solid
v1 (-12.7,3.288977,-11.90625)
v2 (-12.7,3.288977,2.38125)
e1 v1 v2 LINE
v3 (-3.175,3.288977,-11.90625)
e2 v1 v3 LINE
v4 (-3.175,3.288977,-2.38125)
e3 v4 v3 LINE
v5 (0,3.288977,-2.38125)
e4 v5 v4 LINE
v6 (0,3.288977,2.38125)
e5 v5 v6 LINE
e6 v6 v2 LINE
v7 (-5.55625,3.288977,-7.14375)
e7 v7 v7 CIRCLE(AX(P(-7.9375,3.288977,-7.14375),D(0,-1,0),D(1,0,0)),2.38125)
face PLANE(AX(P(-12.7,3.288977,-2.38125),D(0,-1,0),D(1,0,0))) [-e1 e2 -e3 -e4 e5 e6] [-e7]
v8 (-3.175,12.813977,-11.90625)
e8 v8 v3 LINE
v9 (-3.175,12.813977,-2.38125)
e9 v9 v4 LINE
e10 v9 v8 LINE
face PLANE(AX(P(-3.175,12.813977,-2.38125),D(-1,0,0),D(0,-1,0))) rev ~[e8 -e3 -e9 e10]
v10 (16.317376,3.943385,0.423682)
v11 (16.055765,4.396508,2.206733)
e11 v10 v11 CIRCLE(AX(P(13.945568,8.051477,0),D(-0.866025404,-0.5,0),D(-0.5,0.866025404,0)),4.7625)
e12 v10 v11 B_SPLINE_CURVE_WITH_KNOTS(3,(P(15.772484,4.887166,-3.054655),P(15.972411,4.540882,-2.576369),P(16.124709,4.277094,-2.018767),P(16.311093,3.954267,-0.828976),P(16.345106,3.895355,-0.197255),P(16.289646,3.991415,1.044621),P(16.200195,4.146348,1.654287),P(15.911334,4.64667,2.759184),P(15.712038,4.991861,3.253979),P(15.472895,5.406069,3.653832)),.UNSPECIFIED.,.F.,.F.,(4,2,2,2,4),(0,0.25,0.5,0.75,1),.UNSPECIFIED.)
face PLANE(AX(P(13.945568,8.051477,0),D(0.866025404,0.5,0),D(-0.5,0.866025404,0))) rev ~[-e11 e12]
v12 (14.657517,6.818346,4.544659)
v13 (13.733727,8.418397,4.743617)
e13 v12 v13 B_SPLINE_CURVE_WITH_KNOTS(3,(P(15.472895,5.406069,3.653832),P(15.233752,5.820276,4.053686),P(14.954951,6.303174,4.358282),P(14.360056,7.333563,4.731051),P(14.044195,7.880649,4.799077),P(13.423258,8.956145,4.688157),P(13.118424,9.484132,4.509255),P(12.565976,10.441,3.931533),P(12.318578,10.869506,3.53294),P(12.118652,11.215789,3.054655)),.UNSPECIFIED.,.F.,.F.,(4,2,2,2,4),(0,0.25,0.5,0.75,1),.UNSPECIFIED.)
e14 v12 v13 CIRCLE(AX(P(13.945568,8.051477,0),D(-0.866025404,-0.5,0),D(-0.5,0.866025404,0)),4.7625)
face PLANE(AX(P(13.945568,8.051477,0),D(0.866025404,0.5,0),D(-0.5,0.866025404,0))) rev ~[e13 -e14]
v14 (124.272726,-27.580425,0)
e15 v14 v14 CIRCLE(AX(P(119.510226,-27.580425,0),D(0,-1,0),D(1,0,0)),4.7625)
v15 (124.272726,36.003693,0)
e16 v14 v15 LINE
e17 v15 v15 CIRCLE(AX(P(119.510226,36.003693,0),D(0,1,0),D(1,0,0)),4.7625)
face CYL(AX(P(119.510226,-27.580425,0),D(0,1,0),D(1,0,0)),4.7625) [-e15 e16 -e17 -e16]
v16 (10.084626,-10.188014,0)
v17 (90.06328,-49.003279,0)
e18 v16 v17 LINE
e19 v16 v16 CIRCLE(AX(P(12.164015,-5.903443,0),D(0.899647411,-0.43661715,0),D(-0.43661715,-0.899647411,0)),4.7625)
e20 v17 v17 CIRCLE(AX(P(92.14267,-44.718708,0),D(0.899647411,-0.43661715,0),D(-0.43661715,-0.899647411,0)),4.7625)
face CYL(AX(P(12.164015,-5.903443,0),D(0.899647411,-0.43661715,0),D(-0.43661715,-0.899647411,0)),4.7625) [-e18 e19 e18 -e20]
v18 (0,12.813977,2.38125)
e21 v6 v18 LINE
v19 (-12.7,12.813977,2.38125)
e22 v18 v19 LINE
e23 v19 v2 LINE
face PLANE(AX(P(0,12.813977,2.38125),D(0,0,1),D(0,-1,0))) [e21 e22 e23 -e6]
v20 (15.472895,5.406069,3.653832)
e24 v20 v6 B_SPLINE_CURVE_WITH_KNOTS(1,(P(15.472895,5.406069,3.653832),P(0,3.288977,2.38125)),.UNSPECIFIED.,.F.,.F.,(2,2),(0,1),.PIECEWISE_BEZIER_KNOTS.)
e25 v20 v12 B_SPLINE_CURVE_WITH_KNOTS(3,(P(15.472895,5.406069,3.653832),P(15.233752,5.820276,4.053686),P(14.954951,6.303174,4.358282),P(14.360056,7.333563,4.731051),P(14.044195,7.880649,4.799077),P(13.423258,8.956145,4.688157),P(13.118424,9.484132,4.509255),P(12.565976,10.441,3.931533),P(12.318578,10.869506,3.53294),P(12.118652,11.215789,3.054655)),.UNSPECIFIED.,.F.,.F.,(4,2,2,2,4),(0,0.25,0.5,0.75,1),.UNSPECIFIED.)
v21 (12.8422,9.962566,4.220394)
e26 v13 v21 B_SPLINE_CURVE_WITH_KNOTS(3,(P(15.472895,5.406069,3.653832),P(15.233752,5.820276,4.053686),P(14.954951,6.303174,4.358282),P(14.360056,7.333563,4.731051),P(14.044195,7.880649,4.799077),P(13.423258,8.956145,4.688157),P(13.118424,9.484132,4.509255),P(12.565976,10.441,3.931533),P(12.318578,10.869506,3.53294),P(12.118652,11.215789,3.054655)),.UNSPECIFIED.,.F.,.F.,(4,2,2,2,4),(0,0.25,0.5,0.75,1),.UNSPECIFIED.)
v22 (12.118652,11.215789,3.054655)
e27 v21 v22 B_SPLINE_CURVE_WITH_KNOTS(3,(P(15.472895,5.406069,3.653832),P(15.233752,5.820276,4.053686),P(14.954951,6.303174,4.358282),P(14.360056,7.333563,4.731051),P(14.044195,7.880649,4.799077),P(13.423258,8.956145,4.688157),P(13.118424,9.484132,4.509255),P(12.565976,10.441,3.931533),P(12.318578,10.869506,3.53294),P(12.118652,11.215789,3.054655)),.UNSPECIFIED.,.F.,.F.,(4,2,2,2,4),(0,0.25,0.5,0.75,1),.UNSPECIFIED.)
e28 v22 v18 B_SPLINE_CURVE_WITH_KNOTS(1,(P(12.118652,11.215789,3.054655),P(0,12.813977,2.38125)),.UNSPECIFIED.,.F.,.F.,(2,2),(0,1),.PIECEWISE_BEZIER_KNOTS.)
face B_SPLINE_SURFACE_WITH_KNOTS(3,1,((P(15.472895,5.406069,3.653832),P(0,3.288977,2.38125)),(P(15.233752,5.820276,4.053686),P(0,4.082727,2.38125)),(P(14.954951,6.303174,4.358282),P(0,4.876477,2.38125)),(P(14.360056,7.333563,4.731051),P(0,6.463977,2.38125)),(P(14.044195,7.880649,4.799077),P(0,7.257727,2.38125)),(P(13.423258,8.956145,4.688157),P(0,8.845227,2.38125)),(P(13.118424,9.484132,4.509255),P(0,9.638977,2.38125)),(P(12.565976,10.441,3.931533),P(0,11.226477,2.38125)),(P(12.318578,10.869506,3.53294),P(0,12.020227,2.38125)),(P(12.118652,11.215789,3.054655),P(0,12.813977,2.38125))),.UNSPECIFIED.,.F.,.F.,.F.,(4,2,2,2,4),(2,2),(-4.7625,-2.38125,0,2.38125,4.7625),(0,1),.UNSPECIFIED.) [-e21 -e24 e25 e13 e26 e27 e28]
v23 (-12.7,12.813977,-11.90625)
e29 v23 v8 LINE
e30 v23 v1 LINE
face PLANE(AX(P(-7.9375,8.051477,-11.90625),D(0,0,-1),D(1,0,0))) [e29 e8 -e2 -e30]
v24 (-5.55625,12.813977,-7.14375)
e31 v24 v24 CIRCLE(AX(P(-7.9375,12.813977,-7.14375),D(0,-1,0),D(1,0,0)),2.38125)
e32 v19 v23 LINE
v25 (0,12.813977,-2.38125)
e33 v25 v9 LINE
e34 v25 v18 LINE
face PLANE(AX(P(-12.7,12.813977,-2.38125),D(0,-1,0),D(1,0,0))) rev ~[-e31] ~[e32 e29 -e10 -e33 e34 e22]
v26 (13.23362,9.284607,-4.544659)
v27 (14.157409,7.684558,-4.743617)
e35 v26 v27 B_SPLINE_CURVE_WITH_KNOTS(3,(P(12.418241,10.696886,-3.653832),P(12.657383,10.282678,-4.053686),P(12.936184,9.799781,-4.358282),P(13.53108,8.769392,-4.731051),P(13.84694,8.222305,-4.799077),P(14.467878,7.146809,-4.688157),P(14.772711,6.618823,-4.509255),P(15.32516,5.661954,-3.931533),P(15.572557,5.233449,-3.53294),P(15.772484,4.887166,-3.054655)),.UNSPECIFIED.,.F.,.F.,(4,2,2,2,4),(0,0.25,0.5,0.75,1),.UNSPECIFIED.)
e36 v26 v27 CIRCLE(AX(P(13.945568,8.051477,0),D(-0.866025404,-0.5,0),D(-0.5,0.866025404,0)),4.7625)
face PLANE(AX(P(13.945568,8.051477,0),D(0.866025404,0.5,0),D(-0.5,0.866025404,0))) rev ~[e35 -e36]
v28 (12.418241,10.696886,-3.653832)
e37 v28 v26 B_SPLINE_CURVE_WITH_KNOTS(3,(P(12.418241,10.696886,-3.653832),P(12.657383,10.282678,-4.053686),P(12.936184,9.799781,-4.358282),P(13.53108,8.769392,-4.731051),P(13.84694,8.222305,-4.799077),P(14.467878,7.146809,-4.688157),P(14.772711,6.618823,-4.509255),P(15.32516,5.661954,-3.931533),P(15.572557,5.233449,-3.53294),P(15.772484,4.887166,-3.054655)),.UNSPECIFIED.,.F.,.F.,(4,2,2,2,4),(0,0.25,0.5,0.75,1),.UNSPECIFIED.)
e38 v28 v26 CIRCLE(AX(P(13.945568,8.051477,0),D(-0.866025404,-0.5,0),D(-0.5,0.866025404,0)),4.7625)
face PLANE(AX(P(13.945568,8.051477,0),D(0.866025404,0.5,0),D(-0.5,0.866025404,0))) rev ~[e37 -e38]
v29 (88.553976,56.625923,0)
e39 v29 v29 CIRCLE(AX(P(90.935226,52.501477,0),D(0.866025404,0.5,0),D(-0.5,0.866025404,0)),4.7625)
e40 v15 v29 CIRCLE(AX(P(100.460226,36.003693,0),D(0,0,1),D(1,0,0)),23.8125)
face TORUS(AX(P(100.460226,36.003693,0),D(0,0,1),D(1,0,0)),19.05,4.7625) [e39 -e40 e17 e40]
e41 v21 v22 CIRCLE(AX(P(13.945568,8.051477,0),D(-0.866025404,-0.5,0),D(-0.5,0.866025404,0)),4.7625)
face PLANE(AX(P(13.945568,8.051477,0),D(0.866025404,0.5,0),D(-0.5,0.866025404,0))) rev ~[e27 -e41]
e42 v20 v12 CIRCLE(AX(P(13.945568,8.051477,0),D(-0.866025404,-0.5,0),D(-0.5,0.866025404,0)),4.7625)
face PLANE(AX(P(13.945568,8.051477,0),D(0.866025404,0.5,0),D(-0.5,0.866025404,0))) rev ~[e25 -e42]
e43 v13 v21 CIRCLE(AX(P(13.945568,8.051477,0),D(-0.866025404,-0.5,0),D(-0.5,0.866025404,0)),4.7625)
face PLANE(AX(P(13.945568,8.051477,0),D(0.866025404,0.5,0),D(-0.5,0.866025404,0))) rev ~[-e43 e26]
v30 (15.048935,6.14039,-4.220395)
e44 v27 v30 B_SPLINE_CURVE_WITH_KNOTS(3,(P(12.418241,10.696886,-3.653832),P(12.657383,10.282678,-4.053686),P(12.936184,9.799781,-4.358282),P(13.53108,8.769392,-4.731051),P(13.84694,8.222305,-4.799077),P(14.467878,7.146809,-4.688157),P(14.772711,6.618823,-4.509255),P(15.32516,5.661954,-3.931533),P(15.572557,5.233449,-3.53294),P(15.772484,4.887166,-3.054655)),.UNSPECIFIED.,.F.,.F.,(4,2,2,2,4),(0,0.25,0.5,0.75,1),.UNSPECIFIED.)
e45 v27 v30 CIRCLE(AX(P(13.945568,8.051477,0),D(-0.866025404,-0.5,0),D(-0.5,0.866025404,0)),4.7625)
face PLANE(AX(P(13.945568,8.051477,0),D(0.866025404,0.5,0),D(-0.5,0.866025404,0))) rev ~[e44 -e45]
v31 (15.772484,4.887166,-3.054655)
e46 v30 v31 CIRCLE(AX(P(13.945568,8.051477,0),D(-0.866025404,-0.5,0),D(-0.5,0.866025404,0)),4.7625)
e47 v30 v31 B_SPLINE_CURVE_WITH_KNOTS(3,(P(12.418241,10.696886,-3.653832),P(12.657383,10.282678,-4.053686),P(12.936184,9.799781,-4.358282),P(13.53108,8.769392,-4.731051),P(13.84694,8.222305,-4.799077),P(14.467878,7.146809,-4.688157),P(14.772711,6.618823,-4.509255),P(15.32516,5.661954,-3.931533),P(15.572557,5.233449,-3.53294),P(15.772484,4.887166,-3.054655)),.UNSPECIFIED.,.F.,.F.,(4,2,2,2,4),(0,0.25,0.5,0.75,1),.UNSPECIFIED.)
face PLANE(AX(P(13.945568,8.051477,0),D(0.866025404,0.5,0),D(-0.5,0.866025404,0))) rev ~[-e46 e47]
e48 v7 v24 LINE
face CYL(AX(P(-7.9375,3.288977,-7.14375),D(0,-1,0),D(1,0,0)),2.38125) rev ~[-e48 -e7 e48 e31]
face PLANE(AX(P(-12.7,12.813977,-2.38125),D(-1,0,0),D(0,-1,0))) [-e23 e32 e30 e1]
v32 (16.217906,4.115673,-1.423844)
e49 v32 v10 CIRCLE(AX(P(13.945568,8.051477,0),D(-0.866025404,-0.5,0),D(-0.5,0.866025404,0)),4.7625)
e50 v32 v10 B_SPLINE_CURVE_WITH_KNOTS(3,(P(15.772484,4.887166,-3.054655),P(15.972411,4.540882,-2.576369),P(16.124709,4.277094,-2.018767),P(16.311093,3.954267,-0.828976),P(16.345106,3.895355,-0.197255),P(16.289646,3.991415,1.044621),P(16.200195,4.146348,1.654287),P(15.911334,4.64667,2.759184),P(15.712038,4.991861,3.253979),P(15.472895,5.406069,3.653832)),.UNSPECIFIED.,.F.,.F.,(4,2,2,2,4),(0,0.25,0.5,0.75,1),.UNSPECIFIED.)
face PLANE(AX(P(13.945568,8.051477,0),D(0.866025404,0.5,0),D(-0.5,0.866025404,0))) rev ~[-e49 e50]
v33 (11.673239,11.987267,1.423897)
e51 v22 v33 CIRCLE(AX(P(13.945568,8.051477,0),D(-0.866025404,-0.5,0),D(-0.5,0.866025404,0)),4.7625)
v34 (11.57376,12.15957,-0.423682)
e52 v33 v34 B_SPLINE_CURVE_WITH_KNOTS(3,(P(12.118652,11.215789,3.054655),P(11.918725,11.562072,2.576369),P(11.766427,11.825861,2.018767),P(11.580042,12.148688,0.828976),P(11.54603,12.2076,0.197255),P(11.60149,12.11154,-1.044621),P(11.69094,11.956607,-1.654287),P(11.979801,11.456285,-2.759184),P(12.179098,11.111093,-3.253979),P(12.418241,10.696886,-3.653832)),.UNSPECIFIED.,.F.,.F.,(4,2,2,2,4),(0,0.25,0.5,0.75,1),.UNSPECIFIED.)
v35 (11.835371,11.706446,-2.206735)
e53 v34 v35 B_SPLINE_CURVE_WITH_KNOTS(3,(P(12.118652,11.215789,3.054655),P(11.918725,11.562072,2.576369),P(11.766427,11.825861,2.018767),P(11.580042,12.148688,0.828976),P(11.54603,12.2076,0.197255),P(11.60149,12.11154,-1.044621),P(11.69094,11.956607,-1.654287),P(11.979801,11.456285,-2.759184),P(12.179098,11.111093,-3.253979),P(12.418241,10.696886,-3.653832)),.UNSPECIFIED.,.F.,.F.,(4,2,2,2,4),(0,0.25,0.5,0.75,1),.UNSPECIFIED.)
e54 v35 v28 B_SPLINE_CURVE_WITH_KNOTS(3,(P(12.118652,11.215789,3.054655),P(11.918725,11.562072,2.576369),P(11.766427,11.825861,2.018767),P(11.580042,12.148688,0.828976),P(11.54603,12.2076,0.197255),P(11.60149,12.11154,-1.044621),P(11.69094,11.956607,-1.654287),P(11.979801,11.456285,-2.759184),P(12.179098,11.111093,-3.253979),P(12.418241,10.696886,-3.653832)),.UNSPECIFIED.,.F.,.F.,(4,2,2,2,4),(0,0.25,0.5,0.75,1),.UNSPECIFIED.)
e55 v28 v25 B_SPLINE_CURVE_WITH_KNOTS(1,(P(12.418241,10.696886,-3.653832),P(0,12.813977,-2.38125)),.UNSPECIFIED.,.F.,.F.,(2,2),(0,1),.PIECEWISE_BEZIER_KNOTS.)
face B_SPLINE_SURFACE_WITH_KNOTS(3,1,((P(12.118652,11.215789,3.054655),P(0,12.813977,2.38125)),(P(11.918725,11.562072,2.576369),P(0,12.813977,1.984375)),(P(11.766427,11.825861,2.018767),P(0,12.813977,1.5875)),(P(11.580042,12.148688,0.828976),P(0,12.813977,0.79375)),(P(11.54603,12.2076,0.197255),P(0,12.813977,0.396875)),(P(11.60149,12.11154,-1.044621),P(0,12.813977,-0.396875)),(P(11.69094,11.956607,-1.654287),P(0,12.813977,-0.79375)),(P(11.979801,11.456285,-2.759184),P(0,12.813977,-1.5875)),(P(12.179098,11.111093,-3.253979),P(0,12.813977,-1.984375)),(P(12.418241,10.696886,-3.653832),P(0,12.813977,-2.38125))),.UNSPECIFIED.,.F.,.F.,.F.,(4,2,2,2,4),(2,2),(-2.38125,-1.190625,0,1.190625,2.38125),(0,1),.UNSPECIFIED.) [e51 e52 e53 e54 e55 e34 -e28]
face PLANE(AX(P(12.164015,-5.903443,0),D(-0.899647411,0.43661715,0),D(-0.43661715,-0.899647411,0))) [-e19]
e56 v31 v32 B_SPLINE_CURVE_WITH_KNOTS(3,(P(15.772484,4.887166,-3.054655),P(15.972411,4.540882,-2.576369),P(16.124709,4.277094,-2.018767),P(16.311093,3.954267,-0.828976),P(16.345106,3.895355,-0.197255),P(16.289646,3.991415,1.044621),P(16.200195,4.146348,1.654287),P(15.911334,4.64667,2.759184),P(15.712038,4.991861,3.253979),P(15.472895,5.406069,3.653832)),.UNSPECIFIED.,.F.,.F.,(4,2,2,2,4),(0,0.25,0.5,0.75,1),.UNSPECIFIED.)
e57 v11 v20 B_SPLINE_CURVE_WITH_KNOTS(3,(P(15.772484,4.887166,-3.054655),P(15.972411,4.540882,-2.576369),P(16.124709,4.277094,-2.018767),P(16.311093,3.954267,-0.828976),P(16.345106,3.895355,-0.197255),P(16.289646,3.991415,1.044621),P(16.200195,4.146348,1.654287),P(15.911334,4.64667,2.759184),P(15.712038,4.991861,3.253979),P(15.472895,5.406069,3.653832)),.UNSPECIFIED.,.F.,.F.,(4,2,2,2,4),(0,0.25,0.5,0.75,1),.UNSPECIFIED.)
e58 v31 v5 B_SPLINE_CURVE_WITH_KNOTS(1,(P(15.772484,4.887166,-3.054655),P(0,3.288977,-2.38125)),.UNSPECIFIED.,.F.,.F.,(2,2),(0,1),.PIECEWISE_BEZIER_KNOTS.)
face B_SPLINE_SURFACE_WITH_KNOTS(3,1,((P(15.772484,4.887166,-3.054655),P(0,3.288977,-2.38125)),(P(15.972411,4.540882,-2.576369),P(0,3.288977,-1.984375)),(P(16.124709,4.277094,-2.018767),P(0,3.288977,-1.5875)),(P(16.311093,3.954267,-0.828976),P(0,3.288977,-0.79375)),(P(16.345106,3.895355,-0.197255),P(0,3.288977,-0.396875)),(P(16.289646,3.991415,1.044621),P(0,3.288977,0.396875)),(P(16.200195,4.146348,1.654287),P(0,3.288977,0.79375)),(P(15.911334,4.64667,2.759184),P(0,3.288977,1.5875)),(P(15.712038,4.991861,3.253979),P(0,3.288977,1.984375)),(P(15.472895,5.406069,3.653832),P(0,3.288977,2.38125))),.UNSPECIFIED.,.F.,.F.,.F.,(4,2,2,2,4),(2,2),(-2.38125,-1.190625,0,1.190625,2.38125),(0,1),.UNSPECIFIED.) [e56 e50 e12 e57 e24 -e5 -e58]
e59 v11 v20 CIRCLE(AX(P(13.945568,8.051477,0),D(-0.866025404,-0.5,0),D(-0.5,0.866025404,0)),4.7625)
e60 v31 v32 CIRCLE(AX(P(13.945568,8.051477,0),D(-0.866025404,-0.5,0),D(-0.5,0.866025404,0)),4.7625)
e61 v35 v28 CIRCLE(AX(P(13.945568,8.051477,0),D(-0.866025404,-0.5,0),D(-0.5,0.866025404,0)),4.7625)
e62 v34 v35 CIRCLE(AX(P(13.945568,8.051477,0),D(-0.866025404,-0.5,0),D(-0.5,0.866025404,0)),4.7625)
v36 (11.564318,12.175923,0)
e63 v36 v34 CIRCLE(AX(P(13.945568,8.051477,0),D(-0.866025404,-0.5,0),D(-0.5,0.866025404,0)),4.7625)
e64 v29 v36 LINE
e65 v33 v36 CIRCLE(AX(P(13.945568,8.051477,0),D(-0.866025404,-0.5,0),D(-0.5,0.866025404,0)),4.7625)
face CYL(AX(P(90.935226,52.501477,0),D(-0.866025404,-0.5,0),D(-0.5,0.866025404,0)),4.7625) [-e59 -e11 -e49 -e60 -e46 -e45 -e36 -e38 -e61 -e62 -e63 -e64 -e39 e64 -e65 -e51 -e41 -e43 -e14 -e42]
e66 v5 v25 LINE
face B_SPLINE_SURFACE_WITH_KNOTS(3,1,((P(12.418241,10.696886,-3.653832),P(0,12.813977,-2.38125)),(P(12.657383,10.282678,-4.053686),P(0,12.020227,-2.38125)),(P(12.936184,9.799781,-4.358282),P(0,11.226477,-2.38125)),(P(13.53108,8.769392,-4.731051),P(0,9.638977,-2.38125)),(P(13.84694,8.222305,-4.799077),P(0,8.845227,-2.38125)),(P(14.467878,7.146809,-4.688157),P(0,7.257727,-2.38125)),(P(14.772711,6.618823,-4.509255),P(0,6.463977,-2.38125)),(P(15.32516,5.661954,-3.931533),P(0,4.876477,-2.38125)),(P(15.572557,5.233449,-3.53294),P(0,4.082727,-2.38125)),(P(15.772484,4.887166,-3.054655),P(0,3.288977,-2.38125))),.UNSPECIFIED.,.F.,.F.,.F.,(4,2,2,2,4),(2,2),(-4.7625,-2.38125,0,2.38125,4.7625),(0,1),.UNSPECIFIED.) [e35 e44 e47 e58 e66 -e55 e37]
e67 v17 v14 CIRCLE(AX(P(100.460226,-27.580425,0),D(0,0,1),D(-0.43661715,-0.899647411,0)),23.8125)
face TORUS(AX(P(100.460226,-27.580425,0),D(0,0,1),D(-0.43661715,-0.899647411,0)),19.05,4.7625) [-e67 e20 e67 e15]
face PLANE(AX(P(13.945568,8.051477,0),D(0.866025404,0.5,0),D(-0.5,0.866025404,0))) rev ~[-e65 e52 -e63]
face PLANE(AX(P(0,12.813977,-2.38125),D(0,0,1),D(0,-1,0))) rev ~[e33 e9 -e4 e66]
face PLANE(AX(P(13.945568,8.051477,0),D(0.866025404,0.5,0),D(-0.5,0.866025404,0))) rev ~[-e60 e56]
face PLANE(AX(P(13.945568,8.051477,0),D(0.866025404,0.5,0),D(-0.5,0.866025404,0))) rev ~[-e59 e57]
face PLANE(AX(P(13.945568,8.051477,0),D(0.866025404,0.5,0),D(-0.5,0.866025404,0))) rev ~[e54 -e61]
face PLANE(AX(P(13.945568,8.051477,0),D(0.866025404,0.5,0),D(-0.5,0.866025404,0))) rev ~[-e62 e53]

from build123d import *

# Parameters (mm, degrees)
F2_R      = 4.7625
F4_W      = 9.525
F4_H      = 4.7625
F6_W      = 9.525
F6_H      = 4.7625
F7_DEPTH  = 12.7
F8_W      = 9.525
F8_H      = 9.525
F9_DEPTH  = 9.525
F10_R     = 2.38125
F11_DEPTH = 56.5282161579


# Not quite as in the source:
# - the arcs of a loft's sections are written as splines that run evenly, so that the points pair up as in the source's solid


with BuildPart() as f3:
    # F3: sweep along a path in F0
    with BuildLine(Plane.XY) as f3_path:
        Line((12.1640147262, -5.9034432572), (92.1426695722, -44.7187078965))
        ThreePointArc((92.1426695722, -44.7187078965), (110.5709395271, -43.7258877822), (119.5102262806, -27.5804247152))
        Line((119.5102262806, -27.5804247152), (119.5102262806, 36.0036934298))
        ThreePointArc((119.5102262806, 36.0036934298), (109.9852262806, 52.5014773719), (90.9352262806, 52.5014773719))
        Line((90.9352262806, 52.5014773719), (13.9455678842, 8.0514773719))
    # F2 (on face) → F3 (sweep)
    with BuildSketch(Plane(origin=(12.1640147262, -5.9034432572, 0), x_dir=(-0.43661715, -0.8996474111, 0), z_dir=(-0.8996474111, 0.43661715, 0))):
        Circle(F2_R)
    sweep(path=f3_path.line)

    # F3_face (on face) → F5 section 0
    with BuildSketch(Plane(origin=(13.9455678842, 8.0514773719, 0), x_dir=(0.5, -0.8660254038, 0), z_dir=(-0.8660254038, -0.5, 0))):
        with BuildLine():
            add(Edge.make_bspline(
                [(-3.6538324668, 3.054654572), (-4.0536858153, 2.5763690205), (-4.3582823595, 2.0187671718), (-4.7310510958, 0.8289762047), (-4.7990766193, 0.1972552184), (-4.688156734, -1.0446207235), (-4.5092549675, -1.6542870539), (-3.9315330078, -2.7591836162), (-3.5329401235, -3.2539791184), (-3.054654572, -3.6538324668)],
                knots=[0, 0, 0, 0, 0.25, 0.25, 0.5, 0.5, 0.75, 0.75, 1, 1, 1, 1], degree=3))
            add(Edge.make_bspline(
                [(-3.054654572, -3.6538324668), (-2.5763690205, -4.0536858153), (-2.0187671718, -4.3582823595), (-0.8289762047, -4.7310510958), (-0.1972552184, -4.7990766193), (1.0446207235, -4.688156734), (1.6542870539, -4.5092549675), (2.7591836162, -3.9315330078), (3.2539791184, -3.5329401235), (3.6538324668, -3.054654572)],
                knots=[0, 0, 0, 0, 0.25, 0.25, 0.5, 0.5, 0.75, 0.75, 1, 1, 1, 1], degree=3))
            add(Edge.make_bspline(
                [(3.6538324668, -3.054654572), (4.0536858153, -2.5763690205), (4.3582823595, -2.0187671718), (4.7310510958, -0.8289762047), (4.7990766193, -0.1972552184), (4.688156734, 1.0446207235), (4.5092549675, 1.6542870539), (3.9315330078, 2.7591836162), (3.5329401235, 3.2539791184), (3.054654572, 3.6538324668)],
                knots=[0, 0, 0, 0, 0.25, 0.25, 0.5, 0.5, 0.75, 0.75, 1, 1, 1, 1], degree=3))
            add(Edge.make_bspline(
                [(3.054654572, 3.6538324668), (2.5763690205, 4.0536858153), (2.0187671718, 4.3582823595), (0.8289762047, 4.7310510958), (0.1972552184, 4.7990766193), (-1.0446207235, 4.688156734), (-1.6542870539, 4.5092549675), (-2.7591836162, 3.9315330078), (-3.2539791184, 3.5329401235), (-3.6538324668, 3.054654572)],
                knots=[0, 0, 0, 0, 0.25, 0.25, 0.5, 0.5, 0.75, 0.75, 1, 1, 1, 1], degree=3))
        make_face()
    # F4 (on Right) → F5 section 1
    with BuildSketch(Plane.YZ):
        with Locations((8.0514773719, 0)):
            Rectangle(F4_W, F4_H)
    loft(ruled=True)

    # F6 (on face) → F7 (join)
    with BuildSketch(Plane(origin=(0, 0, 0), x_dir=(0, -1, 0), z_dir=(-1, 0, 0))):
        with Locations((-8.0514773719, 0)):
            Rectangle(F6_W, F6_H)
    extrude(amount=F7_DEPTH)

    # F8 (on face) → F9 (join)
    with BuildSketch(Plane(origin=(0, 0, -2.38125), x_dir=(1, 0, 0), z_dir=(0, 0, -1))):
        with Locations((-7.9375, -8.0514773719)):
            Rectangle(F8_W, F8_H)
    extrude(amount=F9_DEPTH)

    # F10 (on face) → F11 (cut, through all)
    with BuildSketch(Plane.XZ.offset(-3.2889773719)):
        with Locations((-7.9375, -7.14375)):
            Circle(F10_R)
    extrude(amount=-F11_DEPTH, mode=Mode.SUBTRACT)


solid = f3.part
